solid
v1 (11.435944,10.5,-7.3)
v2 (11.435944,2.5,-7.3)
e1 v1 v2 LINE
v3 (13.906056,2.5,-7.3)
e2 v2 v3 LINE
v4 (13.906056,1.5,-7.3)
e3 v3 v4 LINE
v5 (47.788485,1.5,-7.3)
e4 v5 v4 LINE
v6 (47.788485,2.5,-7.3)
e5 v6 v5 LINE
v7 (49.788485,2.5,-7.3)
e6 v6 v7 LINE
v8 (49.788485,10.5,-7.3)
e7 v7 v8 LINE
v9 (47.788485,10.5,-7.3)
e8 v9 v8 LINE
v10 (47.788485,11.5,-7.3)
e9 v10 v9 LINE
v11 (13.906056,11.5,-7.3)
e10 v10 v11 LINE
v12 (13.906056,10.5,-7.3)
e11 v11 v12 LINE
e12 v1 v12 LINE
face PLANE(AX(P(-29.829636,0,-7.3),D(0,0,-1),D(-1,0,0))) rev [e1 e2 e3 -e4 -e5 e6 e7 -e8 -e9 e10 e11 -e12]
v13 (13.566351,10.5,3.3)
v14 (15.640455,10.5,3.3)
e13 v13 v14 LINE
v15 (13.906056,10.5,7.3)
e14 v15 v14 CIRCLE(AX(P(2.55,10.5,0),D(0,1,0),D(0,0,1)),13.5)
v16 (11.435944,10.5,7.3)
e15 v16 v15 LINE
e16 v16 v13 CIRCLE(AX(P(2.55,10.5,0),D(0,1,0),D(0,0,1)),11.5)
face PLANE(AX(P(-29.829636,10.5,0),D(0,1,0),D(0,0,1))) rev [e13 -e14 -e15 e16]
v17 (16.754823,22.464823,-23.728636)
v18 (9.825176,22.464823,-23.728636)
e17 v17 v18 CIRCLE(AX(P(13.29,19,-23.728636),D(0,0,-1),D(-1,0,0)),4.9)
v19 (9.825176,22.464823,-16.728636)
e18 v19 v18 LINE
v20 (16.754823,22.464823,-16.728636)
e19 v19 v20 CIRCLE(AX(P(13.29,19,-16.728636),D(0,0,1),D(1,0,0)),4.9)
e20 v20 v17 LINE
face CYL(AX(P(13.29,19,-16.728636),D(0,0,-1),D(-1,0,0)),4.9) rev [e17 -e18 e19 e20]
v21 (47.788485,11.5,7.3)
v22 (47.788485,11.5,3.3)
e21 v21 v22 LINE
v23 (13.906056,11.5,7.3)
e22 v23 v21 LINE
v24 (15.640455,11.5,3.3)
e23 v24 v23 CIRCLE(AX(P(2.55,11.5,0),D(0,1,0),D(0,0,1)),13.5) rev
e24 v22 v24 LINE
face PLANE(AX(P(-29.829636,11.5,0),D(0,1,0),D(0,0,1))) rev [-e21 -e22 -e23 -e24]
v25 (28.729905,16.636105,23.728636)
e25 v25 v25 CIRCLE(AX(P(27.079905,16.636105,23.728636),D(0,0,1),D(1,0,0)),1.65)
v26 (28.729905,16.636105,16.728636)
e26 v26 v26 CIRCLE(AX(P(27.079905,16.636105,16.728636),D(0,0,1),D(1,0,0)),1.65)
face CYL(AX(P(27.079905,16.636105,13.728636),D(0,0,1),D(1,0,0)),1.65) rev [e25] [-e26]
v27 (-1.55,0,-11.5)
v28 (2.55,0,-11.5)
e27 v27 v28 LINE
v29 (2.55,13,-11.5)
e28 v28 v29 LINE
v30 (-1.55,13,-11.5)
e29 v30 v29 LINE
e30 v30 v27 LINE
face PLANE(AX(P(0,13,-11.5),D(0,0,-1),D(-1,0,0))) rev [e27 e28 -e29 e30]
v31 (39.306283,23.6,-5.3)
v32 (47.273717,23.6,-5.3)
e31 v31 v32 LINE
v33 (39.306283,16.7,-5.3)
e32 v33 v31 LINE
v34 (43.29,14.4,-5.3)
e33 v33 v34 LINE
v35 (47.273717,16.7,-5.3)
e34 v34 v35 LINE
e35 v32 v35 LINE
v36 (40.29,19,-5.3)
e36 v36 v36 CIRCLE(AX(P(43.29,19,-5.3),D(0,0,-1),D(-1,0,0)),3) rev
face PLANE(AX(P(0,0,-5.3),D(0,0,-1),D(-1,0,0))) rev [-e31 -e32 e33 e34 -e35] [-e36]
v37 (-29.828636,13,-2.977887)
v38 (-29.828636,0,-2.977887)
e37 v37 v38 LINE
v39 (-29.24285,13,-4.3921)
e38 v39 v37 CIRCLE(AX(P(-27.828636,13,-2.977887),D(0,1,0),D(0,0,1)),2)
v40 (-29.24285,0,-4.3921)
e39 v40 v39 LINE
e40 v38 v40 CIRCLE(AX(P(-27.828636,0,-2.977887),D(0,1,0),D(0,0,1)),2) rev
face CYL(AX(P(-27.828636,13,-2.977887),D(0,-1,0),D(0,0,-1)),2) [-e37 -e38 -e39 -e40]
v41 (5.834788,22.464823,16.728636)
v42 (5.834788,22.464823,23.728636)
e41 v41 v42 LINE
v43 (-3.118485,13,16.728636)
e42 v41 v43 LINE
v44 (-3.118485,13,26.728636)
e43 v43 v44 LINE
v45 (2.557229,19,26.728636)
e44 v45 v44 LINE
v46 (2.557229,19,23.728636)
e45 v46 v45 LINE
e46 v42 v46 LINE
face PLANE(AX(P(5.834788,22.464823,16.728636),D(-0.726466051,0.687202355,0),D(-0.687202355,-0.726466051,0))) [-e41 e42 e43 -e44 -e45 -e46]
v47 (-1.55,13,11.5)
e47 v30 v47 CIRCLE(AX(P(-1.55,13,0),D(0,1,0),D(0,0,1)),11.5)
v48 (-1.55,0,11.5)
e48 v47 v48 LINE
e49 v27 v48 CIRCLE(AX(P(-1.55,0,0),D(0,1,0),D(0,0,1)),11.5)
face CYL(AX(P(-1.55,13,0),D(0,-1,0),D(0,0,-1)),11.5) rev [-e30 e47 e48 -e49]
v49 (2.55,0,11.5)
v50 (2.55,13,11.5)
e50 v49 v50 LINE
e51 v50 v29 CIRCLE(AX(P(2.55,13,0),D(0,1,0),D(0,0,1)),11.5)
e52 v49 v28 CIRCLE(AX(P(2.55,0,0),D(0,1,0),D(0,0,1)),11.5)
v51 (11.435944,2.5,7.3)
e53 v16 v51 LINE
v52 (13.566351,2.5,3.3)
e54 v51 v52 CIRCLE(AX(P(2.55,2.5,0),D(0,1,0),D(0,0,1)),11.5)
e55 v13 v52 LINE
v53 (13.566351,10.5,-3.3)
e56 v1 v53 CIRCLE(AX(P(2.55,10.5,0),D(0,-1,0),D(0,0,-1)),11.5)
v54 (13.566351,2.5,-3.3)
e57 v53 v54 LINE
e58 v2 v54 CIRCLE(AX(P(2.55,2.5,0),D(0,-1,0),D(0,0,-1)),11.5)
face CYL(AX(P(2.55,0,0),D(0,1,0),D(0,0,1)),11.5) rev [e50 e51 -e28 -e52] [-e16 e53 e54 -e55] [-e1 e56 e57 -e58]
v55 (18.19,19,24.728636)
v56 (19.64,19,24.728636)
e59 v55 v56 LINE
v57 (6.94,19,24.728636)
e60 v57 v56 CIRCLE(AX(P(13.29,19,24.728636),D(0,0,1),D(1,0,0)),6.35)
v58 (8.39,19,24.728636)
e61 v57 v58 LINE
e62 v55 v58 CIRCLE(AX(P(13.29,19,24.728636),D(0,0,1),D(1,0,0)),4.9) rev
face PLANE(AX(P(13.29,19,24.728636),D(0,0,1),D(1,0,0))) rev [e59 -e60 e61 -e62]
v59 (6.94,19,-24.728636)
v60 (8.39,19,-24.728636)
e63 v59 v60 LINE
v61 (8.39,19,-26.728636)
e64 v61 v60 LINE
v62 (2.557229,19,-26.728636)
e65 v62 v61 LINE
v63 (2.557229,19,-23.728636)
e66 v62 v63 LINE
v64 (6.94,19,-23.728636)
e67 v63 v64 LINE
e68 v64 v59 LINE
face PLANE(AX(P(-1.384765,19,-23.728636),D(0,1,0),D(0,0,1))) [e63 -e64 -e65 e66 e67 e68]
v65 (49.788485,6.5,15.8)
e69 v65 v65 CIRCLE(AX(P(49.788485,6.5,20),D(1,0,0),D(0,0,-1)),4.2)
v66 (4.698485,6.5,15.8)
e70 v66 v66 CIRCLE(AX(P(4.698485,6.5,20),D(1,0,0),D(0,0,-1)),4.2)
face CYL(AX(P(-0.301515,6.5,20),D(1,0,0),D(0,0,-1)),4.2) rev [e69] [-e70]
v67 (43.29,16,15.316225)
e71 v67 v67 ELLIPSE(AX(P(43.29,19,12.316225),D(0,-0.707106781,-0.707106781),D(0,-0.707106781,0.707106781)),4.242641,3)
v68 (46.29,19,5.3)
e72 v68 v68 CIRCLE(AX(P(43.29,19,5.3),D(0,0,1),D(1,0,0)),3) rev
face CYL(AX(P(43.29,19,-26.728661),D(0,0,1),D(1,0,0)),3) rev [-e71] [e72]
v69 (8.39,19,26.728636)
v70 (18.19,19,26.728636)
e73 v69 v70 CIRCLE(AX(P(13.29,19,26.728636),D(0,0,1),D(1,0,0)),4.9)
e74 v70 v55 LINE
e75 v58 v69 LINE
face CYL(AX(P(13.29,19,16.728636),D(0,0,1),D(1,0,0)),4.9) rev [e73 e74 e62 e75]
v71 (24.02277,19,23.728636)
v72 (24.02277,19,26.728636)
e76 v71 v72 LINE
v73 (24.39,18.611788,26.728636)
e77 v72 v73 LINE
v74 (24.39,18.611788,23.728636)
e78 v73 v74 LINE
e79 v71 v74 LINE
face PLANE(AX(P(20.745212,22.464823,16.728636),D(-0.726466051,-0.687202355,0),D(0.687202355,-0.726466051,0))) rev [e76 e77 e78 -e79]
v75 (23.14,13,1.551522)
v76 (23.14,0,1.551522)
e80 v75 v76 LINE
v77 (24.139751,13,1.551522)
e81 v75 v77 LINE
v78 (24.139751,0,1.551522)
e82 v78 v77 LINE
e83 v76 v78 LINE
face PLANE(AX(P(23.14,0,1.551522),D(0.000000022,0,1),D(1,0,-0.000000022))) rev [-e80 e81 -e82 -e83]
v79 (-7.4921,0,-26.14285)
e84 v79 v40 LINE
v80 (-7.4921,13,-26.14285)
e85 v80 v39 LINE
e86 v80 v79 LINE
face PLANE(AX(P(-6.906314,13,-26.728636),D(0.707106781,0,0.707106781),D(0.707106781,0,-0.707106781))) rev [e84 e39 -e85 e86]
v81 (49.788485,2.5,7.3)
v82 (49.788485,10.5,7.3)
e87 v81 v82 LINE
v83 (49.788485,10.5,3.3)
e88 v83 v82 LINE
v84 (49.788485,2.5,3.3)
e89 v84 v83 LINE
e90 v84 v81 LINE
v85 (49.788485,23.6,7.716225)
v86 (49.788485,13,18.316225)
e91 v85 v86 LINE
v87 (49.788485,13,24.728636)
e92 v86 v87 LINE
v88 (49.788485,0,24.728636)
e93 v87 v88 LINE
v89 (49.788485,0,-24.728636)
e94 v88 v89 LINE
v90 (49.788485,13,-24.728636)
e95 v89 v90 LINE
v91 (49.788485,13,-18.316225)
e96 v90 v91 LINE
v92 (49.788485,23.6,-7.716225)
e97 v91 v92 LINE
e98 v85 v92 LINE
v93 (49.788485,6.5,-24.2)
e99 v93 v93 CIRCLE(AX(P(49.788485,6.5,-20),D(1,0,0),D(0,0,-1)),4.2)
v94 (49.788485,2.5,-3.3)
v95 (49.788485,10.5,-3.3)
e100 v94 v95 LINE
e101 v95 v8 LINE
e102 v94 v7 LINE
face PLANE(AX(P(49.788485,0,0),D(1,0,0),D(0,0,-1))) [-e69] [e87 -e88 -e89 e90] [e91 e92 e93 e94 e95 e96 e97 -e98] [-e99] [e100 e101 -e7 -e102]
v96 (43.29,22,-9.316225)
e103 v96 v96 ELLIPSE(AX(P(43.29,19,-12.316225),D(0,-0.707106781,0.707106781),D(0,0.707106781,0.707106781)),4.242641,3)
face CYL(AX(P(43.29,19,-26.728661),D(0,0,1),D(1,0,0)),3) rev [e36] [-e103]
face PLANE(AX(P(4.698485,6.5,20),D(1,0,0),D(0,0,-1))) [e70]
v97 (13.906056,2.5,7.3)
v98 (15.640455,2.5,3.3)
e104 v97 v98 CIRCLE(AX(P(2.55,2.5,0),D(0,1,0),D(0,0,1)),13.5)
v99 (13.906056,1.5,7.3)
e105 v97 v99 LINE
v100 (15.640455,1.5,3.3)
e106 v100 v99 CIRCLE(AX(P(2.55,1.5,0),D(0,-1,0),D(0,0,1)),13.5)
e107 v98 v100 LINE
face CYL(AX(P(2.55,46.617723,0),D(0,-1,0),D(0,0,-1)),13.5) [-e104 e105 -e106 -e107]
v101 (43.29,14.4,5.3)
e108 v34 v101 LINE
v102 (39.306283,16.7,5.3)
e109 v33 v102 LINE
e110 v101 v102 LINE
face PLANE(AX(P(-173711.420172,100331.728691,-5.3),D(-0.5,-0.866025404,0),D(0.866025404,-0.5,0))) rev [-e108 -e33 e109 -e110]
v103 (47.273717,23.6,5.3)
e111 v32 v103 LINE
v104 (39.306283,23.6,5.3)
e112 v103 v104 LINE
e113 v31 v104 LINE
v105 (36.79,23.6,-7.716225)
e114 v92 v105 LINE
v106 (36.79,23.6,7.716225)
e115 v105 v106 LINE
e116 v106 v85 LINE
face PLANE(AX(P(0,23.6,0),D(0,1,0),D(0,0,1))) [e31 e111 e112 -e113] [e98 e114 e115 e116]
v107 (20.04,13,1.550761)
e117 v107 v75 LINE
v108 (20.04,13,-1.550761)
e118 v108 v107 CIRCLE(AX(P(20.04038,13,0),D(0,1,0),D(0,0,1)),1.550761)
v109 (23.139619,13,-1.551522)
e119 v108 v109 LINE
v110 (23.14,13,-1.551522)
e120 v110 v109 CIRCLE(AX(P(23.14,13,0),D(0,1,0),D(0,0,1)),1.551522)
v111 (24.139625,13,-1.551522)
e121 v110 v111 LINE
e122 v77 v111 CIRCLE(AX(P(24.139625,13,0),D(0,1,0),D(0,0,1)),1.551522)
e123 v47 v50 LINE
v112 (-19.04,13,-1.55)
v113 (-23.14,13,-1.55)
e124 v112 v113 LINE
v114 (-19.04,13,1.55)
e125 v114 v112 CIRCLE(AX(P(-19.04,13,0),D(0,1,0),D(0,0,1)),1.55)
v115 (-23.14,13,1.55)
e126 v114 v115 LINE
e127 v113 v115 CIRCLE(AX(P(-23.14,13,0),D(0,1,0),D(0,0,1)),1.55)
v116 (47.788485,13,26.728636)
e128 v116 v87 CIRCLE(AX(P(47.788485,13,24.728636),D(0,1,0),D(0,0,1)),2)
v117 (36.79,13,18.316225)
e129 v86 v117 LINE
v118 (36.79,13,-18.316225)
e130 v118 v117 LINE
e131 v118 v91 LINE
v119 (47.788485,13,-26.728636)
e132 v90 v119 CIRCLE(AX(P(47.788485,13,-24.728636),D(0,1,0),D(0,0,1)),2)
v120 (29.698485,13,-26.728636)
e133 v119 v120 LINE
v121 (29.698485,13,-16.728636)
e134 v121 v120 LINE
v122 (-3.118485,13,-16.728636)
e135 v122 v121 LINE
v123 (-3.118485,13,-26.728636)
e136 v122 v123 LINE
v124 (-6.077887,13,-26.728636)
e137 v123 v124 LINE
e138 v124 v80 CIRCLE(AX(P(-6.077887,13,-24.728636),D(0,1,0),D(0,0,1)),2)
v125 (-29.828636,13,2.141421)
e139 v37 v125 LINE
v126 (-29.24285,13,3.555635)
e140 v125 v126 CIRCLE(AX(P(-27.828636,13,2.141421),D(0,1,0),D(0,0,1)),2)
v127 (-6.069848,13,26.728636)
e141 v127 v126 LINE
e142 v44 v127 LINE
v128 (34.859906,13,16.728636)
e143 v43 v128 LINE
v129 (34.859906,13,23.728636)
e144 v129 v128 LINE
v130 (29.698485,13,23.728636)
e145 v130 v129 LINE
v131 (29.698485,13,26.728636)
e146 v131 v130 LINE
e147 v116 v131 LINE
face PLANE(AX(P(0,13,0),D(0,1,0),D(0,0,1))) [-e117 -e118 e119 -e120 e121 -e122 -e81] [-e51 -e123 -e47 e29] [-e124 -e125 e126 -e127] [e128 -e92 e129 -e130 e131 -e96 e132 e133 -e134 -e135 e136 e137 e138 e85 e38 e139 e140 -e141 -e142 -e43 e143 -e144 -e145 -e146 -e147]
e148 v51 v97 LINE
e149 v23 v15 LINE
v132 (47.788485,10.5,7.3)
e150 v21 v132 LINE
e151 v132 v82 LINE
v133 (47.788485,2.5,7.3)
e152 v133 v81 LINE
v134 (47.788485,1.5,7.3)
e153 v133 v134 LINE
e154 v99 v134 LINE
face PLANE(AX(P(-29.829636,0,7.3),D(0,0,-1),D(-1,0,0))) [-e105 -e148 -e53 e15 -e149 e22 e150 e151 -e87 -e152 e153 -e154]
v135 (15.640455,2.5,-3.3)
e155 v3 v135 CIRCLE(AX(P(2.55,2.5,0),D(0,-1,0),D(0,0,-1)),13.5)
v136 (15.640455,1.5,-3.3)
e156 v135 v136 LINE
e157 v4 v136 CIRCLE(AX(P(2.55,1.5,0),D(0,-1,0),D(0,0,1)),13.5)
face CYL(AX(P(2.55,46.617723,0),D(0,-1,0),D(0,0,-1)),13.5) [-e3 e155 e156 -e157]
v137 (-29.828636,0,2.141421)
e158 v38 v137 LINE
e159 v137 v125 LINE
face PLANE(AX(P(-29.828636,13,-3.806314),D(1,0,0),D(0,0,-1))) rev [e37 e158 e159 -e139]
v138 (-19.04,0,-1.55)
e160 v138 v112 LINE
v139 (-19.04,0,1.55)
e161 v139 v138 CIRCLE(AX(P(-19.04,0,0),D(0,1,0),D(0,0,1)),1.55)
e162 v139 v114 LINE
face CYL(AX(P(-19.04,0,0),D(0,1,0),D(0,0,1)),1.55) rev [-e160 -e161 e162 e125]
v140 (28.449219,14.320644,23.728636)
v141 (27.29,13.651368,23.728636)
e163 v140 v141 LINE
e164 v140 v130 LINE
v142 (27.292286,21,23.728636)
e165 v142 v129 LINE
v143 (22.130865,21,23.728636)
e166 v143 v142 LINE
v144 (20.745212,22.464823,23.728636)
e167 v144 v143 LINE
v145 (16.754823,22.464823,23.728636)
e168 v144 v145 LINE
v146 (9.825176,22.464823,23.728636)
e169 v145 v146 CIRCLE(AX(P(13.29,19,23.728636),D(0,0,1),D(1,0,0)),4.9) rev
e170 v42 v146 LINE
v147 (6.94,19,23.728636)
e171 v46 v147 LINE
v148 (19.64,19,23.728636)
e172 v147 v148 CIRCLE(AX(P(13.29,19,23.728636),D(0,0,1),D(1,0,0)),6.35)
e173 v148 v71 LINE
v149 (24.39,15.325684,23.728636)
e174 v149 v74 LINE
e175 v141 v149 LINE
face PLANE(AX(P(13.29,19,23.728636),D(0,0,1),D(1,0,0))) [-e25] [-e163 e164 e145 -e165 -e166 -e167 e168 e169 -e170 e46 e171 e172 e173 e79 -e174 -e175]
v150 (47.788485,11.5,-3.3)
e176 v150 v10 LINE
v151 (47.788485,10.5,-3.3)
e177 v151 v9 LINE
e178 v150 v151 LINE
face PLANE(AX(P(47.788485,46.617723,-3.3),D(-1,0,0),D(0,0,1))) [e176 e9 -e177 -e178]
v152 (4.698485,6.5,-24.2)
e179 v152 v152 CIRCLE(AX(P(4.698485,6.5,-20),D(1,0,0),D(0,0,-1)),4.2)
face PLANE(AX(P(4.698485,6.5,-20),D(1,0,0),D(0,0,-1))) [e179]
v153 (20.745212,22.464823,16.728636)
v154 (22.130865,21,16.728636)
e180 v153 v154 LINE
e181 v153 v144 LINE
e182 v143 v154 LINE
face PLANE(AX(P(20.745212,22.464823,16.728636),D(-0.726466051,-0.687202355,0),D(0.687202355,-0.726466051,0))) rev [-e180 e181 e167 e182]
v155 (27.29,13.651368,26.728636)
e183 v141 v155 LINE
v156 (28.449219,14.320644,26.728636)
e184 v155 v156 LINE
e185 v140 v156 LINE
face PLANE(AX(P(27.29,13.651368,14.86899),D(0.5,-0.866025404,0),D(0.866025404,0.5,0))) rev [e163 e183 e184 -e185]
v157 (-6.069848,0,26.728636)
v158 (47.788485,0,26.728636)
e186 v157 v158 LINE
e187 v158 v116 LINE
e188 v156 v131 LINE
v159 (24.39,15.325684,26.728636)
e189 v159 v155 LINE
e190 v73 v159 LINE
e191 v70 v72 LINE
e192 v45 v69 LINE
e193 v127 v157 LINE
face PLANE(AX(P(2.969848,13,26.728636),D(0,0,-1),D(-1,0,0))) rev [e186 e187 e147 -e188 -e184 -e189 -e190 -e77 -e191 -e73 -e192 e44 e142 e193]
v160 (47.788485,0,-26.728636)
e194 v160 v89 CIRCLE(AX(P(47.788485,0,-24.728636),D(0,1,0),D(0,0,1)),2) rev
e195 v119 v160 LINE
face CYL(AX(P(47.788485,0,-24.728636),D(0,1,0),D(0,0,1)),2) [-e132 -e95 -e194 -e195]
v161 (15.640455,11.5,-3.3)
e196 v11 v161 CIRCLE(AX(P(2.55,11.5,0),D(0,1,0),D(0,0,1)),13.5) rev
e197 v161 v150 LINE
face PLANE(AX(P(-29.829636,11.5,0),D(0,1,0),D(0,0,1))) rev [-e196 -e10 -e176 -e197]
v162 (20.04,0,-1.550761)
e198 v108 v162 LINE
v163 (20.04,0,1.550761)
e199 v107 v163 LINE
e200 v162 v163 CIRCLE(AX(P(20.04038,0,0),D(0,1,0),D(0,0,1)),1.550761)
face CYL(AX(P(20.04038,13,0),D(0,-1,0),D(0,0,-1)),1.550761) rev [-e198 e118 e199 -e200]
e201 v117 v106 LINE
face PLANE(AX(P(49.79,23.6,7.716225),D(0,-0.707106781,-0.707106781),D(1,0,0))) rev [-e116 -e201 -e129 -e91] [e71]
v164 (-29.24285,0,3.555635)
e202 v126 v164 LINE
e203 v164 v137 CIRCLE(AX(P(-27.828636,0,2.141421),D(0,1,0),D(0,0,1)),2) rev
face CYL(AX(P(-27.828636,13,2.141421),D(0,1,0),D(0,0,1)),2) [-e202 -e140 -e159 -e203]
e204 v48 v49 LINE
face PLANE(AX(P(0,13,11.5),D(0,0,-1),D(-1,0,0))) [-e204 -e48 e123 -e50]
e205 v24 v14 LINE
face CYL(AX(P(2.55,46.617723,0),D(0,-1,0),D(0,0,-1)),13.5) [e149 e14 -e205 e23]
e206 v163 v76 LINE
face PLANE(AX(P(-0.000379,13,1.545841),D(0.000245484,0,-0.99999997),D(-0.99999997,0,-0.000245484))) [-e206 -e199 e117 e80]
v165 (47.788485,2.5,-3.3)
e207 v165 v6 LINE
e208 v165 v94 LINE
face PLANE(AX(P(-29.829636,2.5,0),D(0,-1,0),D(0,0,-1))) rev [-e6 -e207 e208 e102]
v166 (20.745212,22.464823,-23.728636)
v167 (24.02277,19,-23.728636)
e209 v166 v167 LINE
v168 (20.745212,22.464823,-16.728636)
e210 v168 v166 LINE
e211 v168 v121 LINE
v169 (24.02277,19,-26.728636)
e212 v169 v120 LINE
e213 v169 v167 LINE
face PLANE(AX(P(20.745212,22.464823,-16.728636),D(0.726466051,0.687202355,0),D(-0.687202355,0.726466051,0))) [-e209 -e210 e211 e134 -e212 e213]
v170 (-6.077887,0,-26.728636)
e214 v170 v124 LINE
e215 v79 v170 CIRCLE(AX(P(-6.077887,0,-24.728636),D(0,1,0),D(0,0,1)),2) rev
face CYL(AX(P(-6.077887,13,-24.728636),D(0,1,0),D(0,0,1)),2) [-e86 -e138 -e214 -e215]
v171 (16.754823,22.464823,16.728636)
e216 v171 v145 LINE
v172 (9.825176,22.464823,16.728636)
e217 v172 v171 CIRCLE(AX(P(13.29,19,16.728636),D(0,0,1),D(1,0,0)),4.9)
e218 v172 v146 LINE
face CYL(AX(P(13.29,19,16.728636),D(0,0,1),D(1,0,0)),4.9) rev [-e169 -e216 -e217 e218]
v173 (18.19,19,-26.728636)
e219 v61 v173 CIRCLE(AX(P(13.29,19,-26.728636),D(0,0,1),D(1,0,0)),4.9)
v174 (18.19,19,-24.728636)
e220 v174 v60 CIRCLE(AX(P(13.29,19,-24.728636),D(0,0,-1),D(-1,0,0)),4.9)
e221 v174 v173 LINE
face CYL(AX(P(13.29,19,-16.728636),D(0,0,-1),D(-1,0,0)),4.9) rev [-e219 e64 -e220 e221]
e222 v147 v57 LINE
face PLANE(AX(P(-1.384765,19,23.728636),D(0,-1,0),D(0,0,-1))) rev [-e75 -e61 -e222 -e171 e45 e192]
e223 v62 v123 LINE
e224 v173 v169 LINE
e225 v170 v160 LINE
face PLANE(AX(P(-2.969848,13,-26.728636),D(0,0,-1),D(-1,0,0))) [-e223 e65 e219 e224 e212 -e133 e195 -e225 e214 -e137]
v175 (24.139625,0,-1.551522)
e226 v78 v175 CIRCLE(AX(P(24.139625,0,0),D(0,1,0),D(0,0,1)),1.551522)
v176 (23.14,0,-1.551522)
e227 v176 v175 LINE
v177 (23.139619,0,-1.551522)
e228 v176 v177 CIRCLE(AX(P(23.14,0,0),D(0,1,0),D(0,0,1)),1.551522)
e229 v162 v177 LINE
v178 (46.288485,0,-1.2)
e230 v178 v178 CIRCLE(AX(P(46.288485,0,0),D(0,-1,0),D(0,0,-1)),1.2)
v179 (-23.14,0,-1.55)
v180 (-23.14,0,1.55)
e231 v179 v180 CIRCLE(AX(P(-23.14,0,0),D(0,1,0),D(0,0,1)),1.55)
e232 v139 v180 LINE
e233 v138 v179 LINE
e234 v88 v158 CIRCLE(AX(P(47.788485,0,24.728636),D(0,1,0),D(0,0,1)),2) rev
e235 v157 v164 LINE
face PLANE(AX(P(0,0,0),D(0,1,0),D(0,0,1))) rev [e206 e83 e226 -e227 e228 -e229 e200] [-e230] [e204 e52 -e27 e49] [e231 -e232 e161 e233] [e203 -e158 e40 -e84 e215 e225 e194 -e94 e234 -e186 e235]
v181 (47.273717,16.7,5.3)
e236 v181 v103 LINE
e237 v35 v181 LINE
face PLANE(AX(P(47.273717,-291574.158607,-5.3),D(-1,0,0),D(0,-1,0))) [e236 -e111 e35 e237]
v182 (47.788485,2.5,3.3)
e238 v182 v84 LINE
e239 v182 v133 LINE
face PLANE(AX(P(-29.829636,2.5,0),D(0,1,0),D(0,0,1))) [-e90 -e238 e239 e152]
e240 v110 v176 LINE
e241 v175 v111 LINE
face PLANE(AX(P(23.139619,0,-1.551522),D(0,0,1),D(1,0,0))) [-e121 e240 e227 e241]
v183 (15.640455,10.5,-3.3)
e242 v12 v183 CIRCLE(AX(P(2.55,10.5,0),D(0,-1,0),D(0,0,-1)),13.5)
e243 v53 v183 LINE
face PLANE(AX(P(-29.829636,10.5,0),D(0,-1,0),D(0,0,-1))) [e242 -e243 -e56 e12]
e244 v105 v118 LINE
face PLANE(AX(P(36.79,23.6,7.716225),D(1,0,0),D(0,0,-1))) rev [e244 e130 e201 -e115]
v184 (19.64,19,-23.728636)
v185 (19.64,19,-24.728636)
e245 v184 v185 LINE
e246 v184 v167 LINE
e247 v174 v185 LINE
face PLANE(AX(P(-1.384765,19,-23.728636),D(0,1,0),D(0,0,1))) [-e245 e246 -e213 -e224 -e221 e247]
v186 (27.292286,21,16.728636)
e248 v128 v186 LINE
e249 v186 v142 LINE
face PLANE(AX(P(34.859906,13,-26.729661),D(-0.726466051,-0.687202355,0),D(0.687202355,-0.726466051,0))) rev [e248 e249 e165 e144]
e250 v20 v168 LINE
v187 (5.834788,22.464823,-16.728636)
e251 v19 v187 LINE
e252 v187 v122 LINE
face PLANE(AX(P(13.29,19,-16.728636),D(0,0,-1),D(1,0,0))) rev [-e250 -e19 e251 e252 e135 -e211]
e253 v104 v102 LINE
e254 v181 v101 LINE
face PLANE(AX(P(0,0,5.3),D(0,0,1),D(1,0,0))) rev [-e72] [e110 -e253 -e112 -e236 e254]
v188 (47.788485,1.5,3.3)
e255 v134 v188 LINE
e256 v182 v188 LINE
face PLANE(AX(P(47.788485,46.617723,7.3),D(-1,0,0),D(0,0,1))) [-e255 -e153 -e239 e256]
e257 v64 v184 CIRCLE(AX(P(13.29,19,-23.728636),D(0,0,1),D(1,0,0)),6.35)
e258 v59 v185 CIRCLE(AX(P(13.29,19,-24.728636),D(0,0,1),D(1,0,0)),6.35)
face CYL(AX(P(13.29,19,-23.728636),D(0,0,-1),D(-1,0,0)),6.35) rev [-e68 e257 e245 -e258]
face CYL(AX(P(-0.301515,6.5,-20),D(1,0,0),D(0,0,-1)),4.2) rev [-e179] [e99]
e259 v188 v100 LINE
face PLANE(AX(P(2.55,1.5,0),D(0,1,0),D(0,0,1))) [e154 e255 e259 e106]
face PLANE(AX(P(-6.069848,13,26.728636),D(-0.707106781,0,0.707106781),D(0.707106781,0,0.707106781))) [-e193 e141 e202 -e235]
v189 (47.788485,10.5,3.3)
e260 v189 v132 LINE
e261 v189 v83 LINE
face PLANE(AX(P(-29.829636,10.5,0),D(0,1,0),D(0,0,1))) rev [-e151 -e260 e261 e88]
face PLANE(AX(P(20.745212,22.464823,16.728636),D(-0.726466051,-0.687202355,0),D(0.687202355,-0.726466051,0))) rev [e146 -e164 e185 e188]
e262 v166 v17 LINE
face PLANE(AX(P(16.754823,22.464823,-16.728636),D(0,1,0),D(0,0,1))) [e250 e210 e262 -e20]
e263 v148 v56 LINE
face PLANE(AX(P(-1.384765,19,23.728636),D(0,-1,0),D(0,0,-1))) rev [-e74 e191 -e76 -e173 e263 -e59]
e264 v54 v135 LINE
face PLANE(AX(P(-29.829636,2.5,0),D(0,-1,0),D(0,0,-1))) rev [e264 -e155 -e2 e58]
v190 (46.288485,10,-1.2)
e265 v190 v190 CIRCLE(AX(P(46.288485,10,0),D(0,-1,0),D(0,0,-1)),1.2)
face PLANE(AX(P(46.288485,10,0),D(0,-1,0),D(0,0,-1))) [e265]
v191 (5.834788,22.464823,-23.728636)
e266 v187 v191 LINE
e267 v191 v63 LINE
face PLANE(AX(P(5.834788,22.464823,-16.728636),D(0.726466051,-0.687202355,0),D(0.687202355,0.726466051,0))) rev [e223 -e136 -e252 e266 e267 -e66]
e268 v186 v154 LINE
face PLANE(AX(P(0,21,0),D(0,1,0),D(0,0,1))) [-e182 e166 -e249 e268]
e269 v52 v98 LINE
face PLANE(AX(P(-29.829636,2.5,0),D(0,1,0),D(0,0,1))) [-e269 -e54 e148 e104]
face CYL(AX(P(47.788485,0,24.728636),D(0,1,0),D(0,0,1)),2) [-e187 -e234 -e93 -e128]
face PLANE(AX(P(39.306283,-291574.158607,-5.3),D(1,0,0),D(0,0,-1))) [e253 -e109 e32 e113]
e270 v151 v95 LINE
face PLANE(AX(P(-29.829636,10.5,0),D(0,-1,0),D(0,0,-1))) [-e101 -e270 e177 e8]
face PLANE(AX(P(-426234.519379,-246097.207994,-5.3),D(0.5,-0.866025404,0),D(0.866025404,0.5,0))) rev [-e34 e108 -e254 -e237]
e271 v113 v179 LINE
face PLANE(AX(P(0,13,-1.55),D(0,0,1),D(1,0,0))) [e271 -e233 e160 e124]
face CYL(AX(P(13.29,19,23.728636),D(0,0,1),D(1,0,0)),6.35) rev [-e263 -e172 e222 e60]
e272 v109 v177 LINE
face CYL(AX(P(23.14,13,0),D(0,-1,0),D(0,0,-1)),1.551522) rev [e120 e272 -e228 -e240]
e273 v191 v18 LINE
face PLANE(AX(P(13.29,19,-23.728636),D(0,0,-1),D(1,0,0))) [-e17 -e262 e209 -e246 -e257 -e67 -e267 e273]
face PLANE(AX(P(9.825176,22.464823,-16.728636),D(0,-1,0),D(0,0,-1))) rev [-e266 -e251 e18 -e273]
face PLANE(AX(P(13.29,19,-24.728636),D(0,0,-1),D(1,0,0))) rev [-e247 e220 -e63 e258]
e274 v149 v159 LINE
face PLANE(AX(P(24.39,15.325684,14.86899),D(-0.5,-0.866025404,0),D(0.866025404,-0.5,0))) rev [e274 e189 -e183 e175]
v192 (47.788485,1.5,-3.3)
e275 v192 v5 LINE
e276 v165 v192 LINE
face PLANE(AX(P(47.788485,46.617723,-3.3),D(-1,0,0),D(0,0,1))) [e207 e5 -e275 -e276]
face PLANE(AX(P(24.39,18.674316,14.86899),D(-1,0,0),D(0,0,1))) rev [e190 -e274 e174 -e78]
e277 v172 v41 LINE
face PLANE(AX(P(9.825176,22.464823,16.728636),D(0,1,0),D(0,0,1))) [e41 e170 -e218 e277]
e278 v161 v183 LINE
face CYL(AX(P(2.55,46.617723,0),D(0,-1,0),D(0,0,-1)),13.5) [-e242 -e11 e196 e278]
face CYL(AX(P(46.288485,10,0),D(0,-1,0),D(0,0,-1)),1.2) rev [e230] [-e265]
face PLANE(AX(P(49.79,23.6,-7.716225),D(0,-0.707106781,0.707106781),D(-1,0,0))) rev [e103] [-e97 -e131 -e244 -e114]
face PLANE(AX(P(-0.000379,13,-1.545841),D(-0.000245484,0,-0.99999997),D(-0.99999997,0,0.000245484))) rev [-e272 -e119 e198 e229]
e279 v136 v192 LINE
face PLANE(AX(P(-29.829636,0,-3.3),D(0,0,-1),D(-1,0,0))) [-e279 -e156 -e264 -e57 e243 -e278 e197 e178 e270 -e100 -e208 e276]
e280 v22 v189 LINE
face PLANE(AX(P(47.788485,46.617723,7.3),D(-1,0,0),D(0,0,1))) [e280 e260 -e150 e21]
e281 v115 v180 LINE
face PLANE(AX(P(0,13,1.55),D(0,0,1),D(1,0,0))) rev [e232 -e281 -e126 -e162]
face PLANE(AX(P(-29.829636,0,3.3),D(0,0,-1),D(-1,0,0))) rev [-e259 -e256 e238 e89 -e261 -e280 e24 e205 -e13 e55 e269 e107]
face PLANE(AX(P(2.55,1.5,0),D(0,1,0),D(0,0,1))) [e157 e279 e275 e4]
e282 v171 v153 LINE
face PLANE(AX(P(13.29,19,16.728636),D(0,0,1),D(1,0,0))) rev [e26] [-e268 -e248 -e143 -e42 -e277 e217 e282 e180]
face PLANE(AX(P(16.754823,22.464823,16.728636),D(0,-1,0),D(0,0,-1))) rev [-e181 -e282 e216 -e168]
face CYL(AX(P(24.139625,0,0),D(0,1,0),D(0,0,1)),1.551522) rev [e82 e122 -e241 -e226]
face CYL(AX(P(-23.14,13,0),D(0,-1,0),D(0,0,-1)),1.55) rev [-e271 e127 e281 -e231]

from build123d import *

# Parameters (mm, degrees)
BOSS_EXTRUDE2_DEPTH      = 13
CUT_EXTRUDE6_DEPTH       = 43.108996013
CUT_EXTRUDE7_DEPTH       = 43.108996013
CUT_EXTRUDE8_DEPTH       = 13
SKETCH7_R                = 4.2
CUT_EXTRUDE9_DEPTH       = 30
BOSS_EXTRUDE3_DEPTH      = 10
CUT_EXTRUDE10_DEPTH      = 1
SKETCH13_R               = 4.2
BOSS_EXTRUDE4_DEPTH      = 20.09
SKETCH17_W               = 13
SKETCH17_H               = 15.432451
BOSS_EXTRUDE5_DEPTH      = 10.6
CHAMFER1_SIZE            = 10.6
SKETCH12_R               = 3
CUT_EXTRUDE11_DEPTH      = 77.770333281
CUT_EXTRUDE12_START      = -6.148636
CUT_EXTRUDE12_DEPTH      = 5.3
FILLET2_R                = 2
SKETCH25_W               = 86.308607618
SKETCH25_H               = 69.103285455
CUT_EXTRUDE13_DEPTH      = 0.00151491
CUT_EXTRUDE14_DEPTH      = 58.985456967
CUT_EXTRUDE15_REACH      = 89.237
CUT_EXTRUDE15_END_RADIUS = 11.5
SKETCH27_W               = 4
SKETCH27_H               = 8
SKETCH30_W               = 15.219906176
SKETCH30_H               = 7
BOSS_EXTRUDE6_DEPTH      = 8
SKETCH28_W               = 26.149590075
SKETCH28_H               = 8.463351347
CUT_EXTRUDE16_DEPTH      = 3
CUT_EXTRUDE17_DEPTH      = 3
SKETCH33_R               = 1.2
CUT_EXTRUDE19_DEPTH      = 10
FILLET9_R                = 2
SKETCH32_R               = 1.65
CUT_EXTRUDE20_DEPTH      = 10
SKETCH34_R               = 4.2
BOSS_EXTRUDE7_DEPTH      = 5
CUT_EXTRUDE22_START      = -13
CUT_EXTRUDE22_DEPTH      = 13
CUT_EXTRUDE23_DEPTH      = 58.985456967
CUT_EXTRUDE24_START      = -1
CUT_EXTRUDE24_DEPTH      = 10
CUT_EXTRUDE25_REACH      = 76.711


# Read off the part's stored shape, not the designer's step: Cut-Extrude22
with BuildPart() as part:
    # Sketch1 → Boss-Extrude2 (new body)
    with BuildSketch(Plane(origin=(0, 0, 0), x_dir=(1, 0, 0), z_dir=(0, 1, 0))):
        Polygon((-2.969848481, 26.728636329), (-6.906313813, 26.728636329), (-29.828636329, 3.806313813), (-29.828636329, -2.969848481), (-6.069848481, -26.728636329), (-2.969848481, -26.728636329), (2.969848481, -26.728636329), (29.69848481, -26.728636329), (29.69848481, 26.728636329), (2.969848481, 26.728636329), align=None)
    extrude(amount=BOSS_EXTRUDE2_DEPTH)

    # Sketch1<8> → Cut-Extrude6 (cut, through all)
    with BuildSketch(Plane(origin=(0, 0, 0), x_dir=(1, 0, 0), z_dir=(0, 1, 0))):
        with BuildLine():
            Line((-23.14, -1.55), (-20.04, -1.55))
            ThreePointArc((-20.04, -1.55), (-18.49, 0), (-20.04, 1.55))
            Line((-20.04, 1.55), (-23.14, 1.55))
            ThreePointArc((-23.14, 1.55), (-24.69, 0), (-23.14, -1.55))
        make_face()
    extrude(amount=CUT_EXTRUDE6_DEPTH, mode=Mode.SUBTRACT)

    # Sketch1<9> → Cut-Extrude7 (cut, through all)
    with BuildSketch(Plane(origin=(0, 0, 0), x_dir=(1, 0, 0), z_dir=(0, 1, 0))):
        with BuildLine():
            Line((9.28999972, -8.505433812), (9.28999972, 8.505433812))
            ThreePointArc((9.28999972, 8.505433812), (5.69954884, 10.725261974), (1.55, 11.5))
            Line((1.55, 11.5), (-1.55, 11.5))
            ThreePointArc((-1.55, 11.5), (-13.05, 0), (-1.55, -11.5))
            Line((-1.55, -11.5), (1.55, -11.5))
            ThreePointArc((1.55, -11.5), (5.69954884, -10.725261974), (9.28999972, -8.505433812))
        make_face()
        with BuildLine():
            ThreePointArc((9.28999972, -8.505433812), (13.05, 0), (9.28999972, 8.505433812))
            Line((9.28999972, 8.505433812), (9.28999972, -8.505433812))
        make_face()
    extrude(amount=CUT_EXTRUDE7_DEPTH, mode=Mode.SUBTRACT)

    # Sketch1<11> → Cut-Extrude8 (cut)
    with BuildSketch(Plane(origin=(0, 0, 0), x_dir=(1, 0, 0), z_dir=(0, 1, 0))):
        with BuildLine():
            Line((23.139619127, 1.551521906), (20.03999972, 1.550761))
            ThreePointArc((20.03999972, 1.550761), (18.48961936, 0), (20.03999972, -1.550761))
            Line((20.03999972, -1.550761), (23.14, -1.551521999))
            ThreePointArc((23.14, -1.551521999), (24.691521964, 0.000190413), (23.139619127, 1.551521906))
        make_face()
        with BuildLine():
            ThreePointArc((21.589619103, -0.059493857), (21.588478024, -1.2e-08), (21.589619104, 0.059493833))
            ThreePointArc((21.589619104, 0.059493833), (21.590760744, -1.2e-08), (21.589619103, -0.059493857))
        make_face(mode=Mode.SUBTRACT)
    extrude(amount=CUT_EXTRUDE8_DEPTH, mode=Mode.SUBTRACT)


with BuildPart() as cut_extrude8_piece_1:
    # of the separate pieces the step leaves, piece 1, a body of its own (cut_extrude8_pieces)
    add(part.part.solids().sort_by_distance((-6.906313813, 0, -26.728636329))[0])

    # Sketch7 → Cut-Extrude9 (cut)
    with BuildSketch(Plane(origin=(29.69848481, 0, 0), x_dir=(0, 0, -1), z_dir=(1, 0, 0))):
        with Locations((-20, 6.5)):
            Circle(SKETCH7_R)
        with Locations((20, 6.5)):
            Circle(SKETCH7_R)
    extrude(amount=-CUT_EXTRUDE9_DEPTH, mode=Mode.SUBTRACT)

    # Sketch9 → Boss-Extrude3 (add)
    with BuildSketch(Plane.XY.offset(26.728636329)):
        with BuildLine():
            Line((-3.11848537, 13), (29.69848481, 13))
            Line((29.69848481, 13), (20.745211893, 22.464823228))
            Line((20.745211893, 22.464823228), (16.754822948, 22.464823228))
            ThreePointArc((16.754822948, 22.464823228), (13.28999972, 14.1), (9.825176492, 22.464823228))
            Line((9.825176492, 22.464823228), (5.834787547, 22.464823228))
            Line((5.834787547, 22.464823228), (-3.11848537, 13))
        make_face()
    boss_extrude3 = extrude(amount=-BOSS_EXTRUDE3_DEPTH)

    # Sketch10 → Cut-Extrude10 (cut)
    with BuildSketch(Plane.XY.offset(24.728636329)):
        with BuildLine():
            Line((6.93999972, 19), (6.93999972, 29.430631577))
            Line((6.93999972, 29.430631577), (19.63999972, 29.430631577))
            Line((19.63999972, 29.430631577), (19.63999972, 19))
            ThreePointArc((19.63999972, 19), (13.28999972, 12.65), (6.93999972, 19))
        make_face()
    cut_extrude10 = extrude(amount=-CUT_EXTRUDE10_DEPTH, mode=Mode.SUBTRACT)

    # Mirror1: Boss-Extrude3, Cut-Extrude10 across plane
    add(boss_extrude3.mirror(Plane.XY))
    add(cut_extrude10.mirror(Plane.XY), mode=Mode.SUBTRACT)

    # Sketch13 → Boss-Extrude4 (add)
    with BuildSketch(Plane(origin=(29.69848481, 0, 0), x_dir=(0, 0, -1), z_dir=(1, 0, 0))):
        Polygon((-26.728636329, 0), (26.728636329, 0), (26.728636329, 13), (16.728636329, 13), (-16.728636329, 13), (-26.728636329, 13), align=None)
        with Locations((-20, 6.5)):
            Circle(SKETCH13_R, mode=Mode.SUBTRACT)
        with Locations((20, 6.5)):
            Circle(SKETCH13_R, mode=Mode.SUBTRACT)
    extrude(amount=BOSS_EXTRUDE4_DEPTH)

    # Sketch17 → Boss-Extrude5 (add)
    with BuildSketch(Plane(origin=(0, 13, 0), x_dir=(1, 0, 0), z_dir=(0, 1, 0))):
        with Locations((43.28999972, 0)):
            Rectangle(SKETCH17_W, SKETCH17_H)
    extrude(amount=BOSS_EXTRUDE5_DEPTH)

    # Chamfer1
    # the kernel refuses this chamfer: 10.6 mm, written as the material it adds along each edge
    with BuildSketch(Plane(origin=(49.78848481, 13, 7.7162255), x_dir=(0, -0.027495876610586376, 0.9996219169112966), z_dir=(-1, 0, 0)), Plane(origin=(36.78999972, 13, -7.7162255), x_dir=(0, -0.02749587661058638, -0.9996219169112966), z_dir=(1, 0, 0))) as chamfer1_piece_1:
        Polygon((CHAMFER1_SIZE * 0.999621916911, CHAMFER1_SIZE * 0.0274958766106), (-CHAMFER1_SIZE * 0.0274958766106, CHAMFER1_SIZE * 0.999621916911), (0, 0), align=None)
    extrude(amount=12.99848509)

    # Sketch12 → Cut-Extrude11 (cut, through all)
    with BuildSketch(Plane.XY.offset(26.728636329)):
        with Locations(Location((43.28999972, 19, 0), (0, 0, 270))):
            Circle(SKETCH12_R)
    extrude(amount=-CUT_EXTRUDE11_DEPTH, mode=Mode.SUBTRACT)

    # Sketch24 → Cut-Extrude12 (cut)
    with BuildSketch(Plane.XY.offset(6.148636329).offset(CUT_EXTRUDE12_START)):
        Polygon((47.273716577, 23.6), (47.273716577, 21.3), (47.273716577, 16.7), (43.28999972, 14.4), (39.306282862, 16.7), (39.306282862, 21.3), (39.306282862, 23.6), align=None)
    cut_extrude12 = extrude(amount=-CUT_EXTRUDE12_DEPTH, mode=Mode.SUBTRACT)

    # Fillet2
    fillet2_edges = [cut_extrude8_piece_1.edges().sort_by_distance(p)[0] for p in [
        (49.78848481, 6.5, 26.728636329),
        (49.78848481, 6.5, -26.728636329),
    ]]
    fillet(fillet2_edges, radius=FILLET2_R)

    # Sketch25 → Cut-Extrude13 (cut)
    with BuildSketch(Plane(origin=(49.78999972, 0, 0), x_dir=(0, 0, -1), z_dir=(1, 0, 0))):
        with Locations((0, 8.901936044)):
            Rectangle(SKETCH25_W, SKETCH25_H)
    extrude(amount=-CUT_EXTRUDE13_DEPTH, mode=Mode.SUBTRACT)

    # Cut-Extrude15: up to this cylinder (the profile starts outside it)
    cut_extrude15_end = Plane(origin=(1.55, 6.5, 0), z_dir=(0, -1, 0)) * Cylinder(CUT_EXTRUDE15_END_RADIUS, 202.474, mode=Mode.PRIVATE)
    # Sketch27 → Cut-Extrude15 (cut, up to the surface)
    with BuildSketch(Plane(origin=(49.78848481, 0, 0), x_dir=(0, 0, -1), z_dir=(1, 0, 0)), mode=Mode.PRIVATE) as cut_extrude15_sk1:
        with Locations((-5.3, 6.5)):
            Rectangle(SKETCH27_W, SKETCH27_H)
    cut_extrude15_tool1 = extrude(cut_extrude15_sk1.sketch, amount=-CUT_EXTRUDE15_REACH, mode=Mode.PRIVATE) - cut_extrude15_end
    cut_extrude15 = cut_extrude15_tool1.solids().sort_by_distance((49.788485, 6.5, 5.3))[0]
    add(cut_extrude15, mode=Mode.SUBTRACT)

    # Mirror2: Cut-Extrude15 across plane
    add(cut_extrude15.mirror(Plane.XY), mode=Mode.SUBTRACT)

    # Mirror3: Cut-Extrude12 across plane
    add(cut_extrude12.mirror(Plane.XY), mode=Mode.SUBTRACT)

    # Sketch30 → Boss-Extrude6 (add)
    with BuildSketch(Plane(origin=(0, 13, 0), x_dir=(1, 0, 0), z_dir=(0, 1, 0))):
        with Locations((27.249952808, -20.228636329)):
            Rectangle(SKETCH30_W, SKETCH30_H)
    extrude(amount=BOSS_EXTRUDE6_DEPTH)

    # Sketch28 → Cut-Extrude16 (cut)
    with BuildSketch(Plane.XY.offset(26.728636329)):
        with Locations((11.690030011, 23.231675673)):
            Rectangle(SKETCH28_W, SKETCH28_H)
    cut_extrude16 = extrude(amount=-CUT_EXTRUDE16_DEPTH, mode=Mode.SUBTRACT)

    # Mirror4: Cut-Extrude16 across plane
    add(cut_extrude16.mirror(Plane.XY), mode=Mode.SUBTRACT)

    # Sketch31 → Cut-Extrude17 (cut)
    with BuildSketch(Plane.XY.offset(26.728636329)):
        Polygon((27.28999972, 20.348631561), (24.38999972, 18.674315781), (24.38999972, 15.325684219), (27.28999972, 13.651368439), (30.18999972, 15.325684219), (30.18999972, 18.674315781), align=None)
    extrude(amount=-CUT_EXTRUDE17_DEPTH, mode=Mode.SUBTRACT)

    # Sketch33 → Cut-Extrude19 (cut)
    with BuildSketch(Plane.XZ):
        with Locations(Location((46.28848481, 0, 0), (0, 0, 270))):
            Circle(SKETCH33_R)
    extrude(amount=-CUT_EXTRUDE19_DEPTH, mode=Mode.SUBTRACT)

    # Fillet9
    fillet9_edges = [cut_extrude8_piece_1.edges().sort_by_distance(p)[0] for p in [
        (-6.906313813, 6.5, -26.728636329),
        (-29.828636329, 6.5, -3.806313813),
        (-29.828636329, 6.5, 2.969848481),
    ]]
    fillet(fillet9_edges, radius=FILLET9_R)

    # Sketch32 → Cut-Extrude20 (cut)
    with BuildSketch(Plane.XY.offset(23.728636329)):
        with Locations((27.079904605, 16.636104587)):
            Circle(SKETCH32_R)
    extrude(amount=-CUT_EXTRUDE20_DEPTH, mode=Mode.SUBTRACT)

    # Sketch34 → Boss-Extrude7 (add)
    with BuildSketch(Plane(origin=(-0.30151519, 0, 0), x_dir=(0, 0, -1), z_dir=(1, 0, 0))):
        with Locations((-20, 6.5)):
            Circle(SKETCH34_R)
        with Locations((20, 6.5)):
            Circle(SKETCH34_R)
    extrude(amount=BOSS_EXTRUDE7_DEPTH)

    # Cut-Extrude22 outline → Cut-Extrude22 (cut)
    with BuildSketch(Plane(origin=(0, 13, 0), x_dir=(1, 0, 0), z_dir=(0, 1, 0)).offset(CUT_EXTRUDE22_START)):
        with BuildLine():
            ThreePointArc((-20.04, 1.55), (-18.49, 0), (-20.04, -1.55))
            Line((-20.04, -1.55), (-19.04, -1.55))
            ThreePointArc((-19.04, -1.55), (-17.49, 0), (-19.04, 1.55))
            Line((-19.04, 1.55), (-20.04, 1.55))
        make_face()
        with BuildLine():
            Line((24.139625451, 1.551521906), (23.14, 1.551521953))
            ThreePointArc((23.14, 1.551521953), (24.691521976, -2.3e-08), (23.14, -1.551521999))
            Line((23.14, -1.551521999), (24.139751204, -1.551521977))
            ThreePointArc((24.139751204, -1.551521977), (25.691147394, 6.2838e-05), (24.139625451, 1.551521906))
        make_face()
    extrude(amount=CUT_EXTRUDE22_DEPTH, mode=Mode.SUBTRACT)

    # Sketch38 → Cut-Extrude23 (cut, through all)
    with BuildSketch(Plane(origin=(0, 13, 0), x_dir=(1, 0, 0), z_dir=(0, 1, 0))):
        with BuildLine():
            ThreePointArc((1.55, 11.5), (13.05, 0), (1.55, -11.5))
            Line((1.55, -11.5), (2.55, -11.5))
            ThreePointArc((2.55, -11.5), (14.05, 0), (2.55, 11.5))
            Line((2.55, 11.5), (1.55, 11.5))
        make_face()
    extrude(amount=-CUT_EXTRUDE23_DEPTH, mode=Mode.SUBTRACT)

    # Sketch39 → Cut-Extrude24 (cut)
    with BuildSketch(Plane(origin=(0, 2.5, 0), x_dir=(1, 0, 0), z_dir=(0, 1, 0)).offset(CUT_EXTRUDE24_START)):
        with BuildLine():
            Line((47.78848481, 7.3), (13.906055653, 7.3))
            ThreePointArc((13.906055653, 7.3), (14.935796911, 5.370478086), (15.640454538, 3.3))
            Line((15.640454538, 3.3), (47.78848481, 3.3))
            Line((47.78848481, 3.3), (47.78848481, 7.3))
        make_face()
        with BuildLine():
            Line((13.906055653, -7.3), (47.78848481, -7.3))
            Line((47.78848481, -7.3), (47.78848481, -3.3))
            Line((47.78848481, -3.3), (15.640454538, -3.3))
            ThreePointArc((15.640454538, -3.3), (14.935796911, -5.370478086), (13.906055653, -7.3))
        make_face()
    extrude(amount=CUT_EXTRUDE24_DEPTH, mode=Mode.SUBTRACT)

    # Sketch40 → Cut-Extrude25 (cut, up to next)
    with BuildSketch(Plane.XY.offset(23.728636329), mode=Mode.PRIVATE) as cut_extrude25_sk1:
        Polygon((34.859905896, 13), (27.29228613, 21), (34.859905896, 21), align=None)
    cut_extrude25_tool1 = extrude(cut_extrude25_sk1.sketch, amount=-CUT_EXTRUDE25_REACH, mode=Mode.PRIVATE) & cut_extrude8_piece_1.part
    add(cut_extrude25_tool1.solids().sort_by_distance((32.337366, 18.333333, 23.728636))[0], mode=Mode.SUBTRACT)


with BuildPart() as cut_extrude8_piece_2:
    # of the separate pieces the step leaves, piece 2, a body of its own (cut_extrude8_pieces)
    add(part.part.solids().sort_by_distance((21.589619104, 0, -0.059493833))[0])

    # Sketch26 → Cut-Extrude14 (cut, through all)
    with BuildSketch(Plane(origin=(0, 13, 0), x_dir=(1, 0, 0), z_dir=(0, 1, 0))):
        with BuildLine():
            ThreePointArc((21.589619104, 0.059493833), (21.588478024, -1.2e-08), (21.589619103, -0.059493857))
            ThreePointArc((21.589619103, -0.059493857), (21.590760744, -1.2e-08), (21.589619104, 0.059493833))
        make_face()
    extrude(amount=-CUT_EXTRUDE14_DEPTH, mode=Mode.SUBTRACT)


solid = cut_extrude8_piece_1.part
